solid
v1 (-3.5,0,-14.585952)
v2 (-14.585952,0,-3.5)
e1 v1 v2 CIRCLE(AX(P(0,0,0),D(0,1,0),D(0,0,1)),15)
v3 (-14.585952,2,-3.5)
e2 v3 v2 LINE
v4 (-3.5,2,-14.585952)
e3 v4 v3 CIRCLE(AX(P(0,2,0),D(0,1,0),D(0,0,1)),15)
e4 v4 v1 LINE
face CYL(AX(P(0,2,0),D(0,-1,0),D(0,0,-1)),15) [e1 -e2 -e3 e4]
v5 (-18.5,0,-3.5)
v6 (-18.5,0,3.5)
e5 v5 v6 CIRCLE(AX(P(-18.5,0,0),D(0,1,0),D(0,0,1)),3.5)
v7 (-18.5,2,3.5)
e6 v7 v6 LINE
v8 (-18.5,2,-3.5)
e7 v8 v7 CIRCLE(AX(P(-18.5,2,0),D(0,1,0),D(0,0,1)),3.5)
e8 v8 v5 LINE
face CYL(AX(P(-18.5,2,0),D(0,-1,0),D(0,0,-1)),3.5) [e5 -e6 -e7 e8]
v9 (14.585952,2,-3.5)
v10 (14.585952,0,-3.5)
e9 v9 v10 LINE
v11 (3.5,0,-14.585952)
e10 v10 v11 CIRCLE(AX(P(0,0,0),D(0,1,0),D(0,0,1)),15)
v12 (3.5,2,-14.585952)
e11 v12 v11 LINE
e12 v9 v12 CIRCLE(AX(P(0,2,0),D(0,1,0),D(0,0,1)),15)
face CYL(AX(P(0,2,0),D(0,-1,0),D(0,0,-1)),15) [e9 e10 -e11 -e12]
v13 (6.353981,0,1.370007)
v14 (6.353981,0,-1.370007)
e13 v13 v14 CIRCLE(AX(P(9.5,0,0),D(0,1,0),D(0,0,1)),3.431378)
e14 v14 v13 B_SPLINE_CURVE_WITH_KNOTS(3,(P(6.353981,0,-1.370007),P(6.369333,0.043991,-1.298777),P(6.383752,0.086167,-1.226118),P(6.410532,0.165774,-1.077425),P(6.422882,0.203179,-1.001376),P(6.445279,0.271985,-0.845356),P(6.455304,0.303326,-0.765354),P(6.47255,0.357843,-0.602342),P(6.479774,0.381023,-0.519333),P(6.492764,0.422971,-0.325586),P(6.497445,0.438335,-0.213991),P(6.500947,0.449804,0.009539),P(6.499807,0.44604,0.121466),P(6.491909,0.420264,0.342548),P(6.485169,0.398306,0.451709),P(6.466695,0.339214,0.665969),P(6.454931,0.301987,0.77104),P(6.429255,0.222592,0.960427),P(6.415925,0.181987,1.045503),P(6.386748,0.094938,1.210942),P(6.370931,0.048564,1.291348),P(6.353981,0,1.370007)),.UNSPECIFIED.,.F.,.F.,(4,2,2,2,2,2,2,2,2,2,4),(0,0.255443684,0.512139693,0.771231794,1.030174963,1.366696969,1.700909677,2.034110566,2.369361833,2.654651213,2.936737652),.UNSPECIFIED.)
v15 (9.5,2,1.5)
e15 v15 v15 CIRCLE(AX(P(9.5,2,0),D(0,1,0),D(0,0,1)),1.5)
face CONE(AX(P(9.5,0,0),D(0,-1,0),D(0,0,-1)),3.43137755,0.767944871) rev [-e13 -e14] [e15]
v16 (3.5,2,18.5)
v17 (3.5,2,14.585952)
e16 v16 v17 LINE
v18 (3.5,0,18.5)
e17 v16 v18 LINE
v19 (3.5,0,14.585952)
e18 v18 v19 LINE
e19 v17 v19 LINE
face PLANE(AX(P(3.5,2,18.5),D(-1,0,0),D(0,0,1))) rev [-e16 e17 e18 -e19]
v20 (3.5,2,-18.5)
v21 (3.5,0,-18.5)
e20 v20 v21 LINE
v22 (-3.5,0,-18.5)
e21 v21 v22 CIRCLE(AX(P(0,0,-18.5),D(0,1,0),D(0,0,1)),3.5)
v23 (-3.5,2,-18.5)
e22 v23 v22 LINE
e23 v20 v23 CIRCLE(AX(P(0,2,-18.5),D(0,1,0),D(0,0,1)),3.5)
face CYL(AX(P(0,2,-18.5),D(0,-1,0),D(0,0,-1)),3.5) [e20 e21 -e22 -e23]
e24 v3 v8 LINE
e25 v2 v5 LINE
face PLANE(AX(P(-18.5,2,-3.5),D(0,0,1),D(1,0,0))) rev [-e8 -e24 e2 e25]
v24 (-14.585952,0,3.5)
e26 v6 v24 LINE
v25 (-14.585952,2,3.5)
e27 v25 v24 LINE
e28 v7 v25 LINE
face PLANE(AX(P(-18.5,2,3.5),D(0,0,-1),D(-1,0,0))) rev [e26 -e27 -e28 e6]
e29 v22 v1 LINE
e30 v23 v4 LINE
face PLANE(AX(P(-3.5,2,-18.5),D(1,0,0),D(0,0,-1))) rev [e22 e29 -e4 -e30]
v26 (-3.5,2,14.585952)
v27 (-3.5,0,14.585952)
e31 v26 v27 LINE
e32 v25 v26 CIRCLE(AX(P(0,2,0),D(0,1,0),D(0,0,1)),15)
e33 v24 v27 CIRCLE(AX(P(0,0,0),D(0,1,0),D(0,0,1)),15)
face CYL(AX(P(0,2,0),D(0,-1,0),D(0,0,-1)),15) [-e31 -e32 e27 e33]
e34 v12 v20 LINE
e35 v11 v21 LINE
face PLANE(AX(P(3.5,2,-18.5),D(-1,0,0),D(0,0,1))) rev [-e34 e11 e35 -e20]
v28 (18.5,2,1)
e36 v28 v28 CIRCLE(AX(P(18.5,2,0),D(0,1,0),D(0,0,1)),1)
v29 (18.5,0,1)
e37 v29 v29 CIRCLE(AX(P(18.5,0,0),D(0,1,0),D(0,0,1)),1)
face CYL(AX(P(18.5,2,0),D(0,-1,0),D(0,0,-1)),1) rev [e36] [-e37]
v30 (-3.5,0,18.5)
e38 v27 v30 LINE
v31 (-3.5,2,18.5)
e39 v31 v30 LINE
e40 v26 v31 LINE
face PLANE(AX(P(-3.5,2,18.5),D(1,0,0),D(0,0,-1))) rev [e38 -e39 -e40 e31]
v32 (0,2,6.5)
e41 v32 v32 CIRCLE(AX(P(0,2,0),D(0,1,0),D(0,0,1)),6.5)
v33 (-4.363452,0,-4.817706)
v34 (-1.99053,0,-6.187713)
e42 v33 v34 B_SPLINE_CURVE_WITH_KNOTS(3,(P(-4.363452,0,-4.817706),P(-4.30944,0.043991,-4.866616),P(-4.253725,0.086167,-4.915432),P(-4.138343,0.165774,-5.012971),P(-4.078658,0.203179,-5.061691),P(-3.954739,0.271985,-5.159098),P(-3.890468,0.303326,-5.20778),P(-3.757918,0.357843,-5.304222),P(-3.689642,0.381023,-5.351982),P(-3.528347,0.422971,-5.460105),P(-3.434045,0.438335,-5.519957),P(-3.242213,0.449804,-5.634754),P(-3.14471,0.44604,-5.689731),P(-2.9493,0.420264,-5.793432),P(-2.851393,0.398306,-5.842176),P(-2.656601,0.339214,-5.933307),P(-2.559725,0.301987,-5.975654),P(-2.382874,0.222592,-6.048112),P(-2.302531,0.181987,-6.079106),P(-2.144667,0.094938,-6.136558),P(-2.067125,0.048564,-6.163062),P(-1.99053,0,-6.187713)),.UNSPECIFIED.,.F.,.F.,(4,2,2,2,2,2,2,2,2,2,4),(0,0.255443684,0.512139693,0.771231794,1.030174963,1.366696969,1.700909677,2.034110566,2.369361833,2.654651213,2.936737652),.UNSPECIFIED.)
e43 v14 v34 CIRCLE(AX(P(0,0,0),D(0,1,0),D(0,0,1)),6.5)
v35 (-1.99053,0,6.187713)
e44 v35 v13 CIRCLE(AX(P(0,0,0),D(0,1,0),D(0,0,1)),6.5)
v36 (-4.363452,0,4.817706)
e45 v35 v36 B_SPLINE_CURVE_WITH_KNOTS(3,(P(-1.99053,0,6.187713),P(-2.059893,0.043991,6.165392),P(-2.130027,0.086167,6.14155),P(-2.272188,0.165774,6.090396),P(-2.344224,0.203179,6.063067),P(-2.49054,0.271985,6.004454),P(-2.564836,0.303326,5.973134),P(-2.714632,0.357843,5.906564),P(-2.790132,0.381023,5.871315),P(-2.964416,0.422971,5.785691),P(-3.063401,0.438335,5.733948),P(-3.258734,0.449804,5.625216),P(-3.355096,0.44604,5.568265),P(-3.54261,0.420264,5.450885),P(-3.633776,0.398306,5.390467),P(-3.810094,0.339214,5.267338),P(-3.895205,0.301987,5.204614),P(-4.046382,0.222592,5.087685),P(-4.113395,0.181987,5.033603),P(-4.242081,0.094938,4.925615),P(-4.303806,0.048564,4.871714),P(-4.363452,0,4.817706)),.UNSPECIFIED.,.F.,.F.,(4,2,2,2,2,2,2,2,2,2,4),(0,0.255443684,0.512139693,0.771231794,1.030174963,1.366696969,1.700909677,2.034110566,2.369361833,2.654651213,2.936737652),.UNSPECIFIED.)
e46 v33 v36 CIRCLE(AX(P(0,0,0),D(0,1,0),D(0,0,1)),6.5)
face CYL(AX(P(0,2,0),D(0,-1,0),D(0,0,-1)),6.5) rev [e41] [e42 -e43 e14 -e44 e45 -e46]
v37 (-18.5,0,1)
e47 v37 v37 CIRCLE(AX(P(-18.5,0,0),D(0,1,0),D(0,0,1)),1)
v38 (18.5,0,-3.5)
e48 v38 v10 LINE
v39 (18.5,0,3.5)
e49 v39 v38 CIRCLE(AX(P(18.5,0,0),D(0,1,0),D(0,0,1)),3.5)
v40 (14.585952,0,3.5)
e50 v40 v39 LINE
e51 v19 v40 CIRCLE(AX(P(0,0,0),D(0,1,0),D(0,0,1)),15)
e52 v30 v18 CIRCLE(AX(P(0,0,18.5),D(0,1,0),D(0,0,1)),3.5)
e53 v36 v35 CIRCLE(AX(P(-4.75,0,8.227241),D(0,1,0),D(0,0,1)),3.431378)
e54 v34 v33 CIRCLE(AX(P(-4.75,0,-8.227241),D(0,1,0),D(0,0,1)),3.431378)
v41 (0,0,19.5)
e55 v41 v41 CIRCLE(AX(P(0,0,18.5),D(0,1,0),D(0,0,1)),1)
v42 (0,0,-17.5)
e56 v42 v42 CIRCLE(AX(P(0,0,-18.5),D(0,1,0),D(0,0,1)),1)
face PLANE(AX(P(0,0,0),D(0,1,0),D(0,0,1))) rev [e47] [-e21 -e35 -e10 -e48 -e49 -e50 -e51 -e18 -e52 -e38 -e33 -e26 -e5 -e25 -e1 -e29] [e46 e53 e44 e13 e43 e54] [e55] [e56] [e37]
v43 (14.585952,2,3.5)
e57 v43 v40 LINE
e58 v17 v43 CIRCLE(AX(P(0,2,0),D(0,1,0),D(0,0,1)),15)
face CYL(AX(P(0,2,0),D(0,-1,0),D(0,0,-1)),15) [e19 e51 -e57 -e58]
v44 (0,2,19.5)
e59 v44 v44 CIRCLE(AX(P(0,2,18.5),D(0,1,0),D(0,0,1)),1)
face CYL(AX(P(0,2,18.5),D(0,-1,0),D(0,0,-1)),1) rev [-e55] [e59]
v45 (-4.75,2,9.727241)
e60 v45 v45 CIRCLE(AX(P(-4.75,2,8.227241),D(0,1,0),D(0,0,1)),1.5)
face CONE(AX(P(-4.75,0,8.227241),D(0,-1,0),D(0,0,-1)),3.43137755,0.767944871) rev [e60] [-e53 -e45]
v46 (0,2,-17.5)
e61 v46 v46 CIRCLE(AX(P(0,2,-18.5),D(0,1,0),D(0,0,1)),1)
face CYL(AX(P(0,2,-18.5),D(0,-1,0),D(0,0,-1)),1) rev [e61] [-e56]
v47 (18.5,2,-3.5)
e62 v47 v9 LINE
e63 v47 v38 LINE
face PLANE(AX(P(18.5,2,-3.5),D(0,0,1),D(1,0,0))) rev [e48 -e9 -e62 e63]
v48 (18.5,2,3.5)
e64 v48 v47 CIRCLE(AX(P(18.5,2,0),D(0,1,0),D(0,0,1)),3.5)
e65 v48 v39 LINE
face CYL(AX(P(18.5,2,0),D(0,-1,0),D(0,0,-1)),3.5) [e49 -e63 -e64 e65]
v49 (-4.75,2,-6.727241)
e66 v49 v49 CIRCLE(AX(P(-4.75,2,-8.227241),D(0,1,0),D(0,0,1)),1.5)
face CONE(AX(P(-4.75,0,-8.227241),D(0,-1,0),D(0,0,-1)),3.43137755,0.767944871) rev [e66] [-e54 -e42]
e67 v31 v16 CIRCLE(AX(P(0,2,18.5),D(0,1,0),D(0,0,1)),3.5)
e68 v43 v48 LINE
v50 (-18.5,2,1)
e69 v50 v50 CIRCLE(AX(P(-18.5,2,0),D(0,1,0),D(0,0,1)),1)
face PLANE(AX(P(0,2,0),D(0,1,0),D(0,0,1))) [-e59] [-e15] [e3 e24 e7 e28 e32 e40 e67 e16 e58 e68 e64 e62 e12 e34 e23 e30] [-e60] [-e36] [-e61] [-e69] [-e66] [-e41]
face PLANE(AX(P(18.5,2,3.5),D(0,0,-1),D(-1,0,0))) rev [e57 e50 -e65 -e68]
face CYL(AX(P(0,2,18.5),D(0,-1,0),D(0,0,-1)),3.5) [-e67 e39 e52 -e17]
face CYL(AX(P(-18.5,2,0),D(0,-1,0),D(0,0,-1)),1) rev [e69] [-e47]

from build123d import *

# Parameters (mm, degrees)
SKETCH_2_R       = 15
SKETCH_2_R_2     = 6.5
SKETCH_2_R_3     = 1.5
EXTRUDE_1_DEPTH  = 2
CHAMFER_1_SIZE   = 2
CHAMFER_1_SIZE_2 = 1.93137755
SKETCH_3_R       = 1
EXTRUDE_2_DEPTH  = 2


with BuildPart() as part:
    # 草图2 → 凸台-拉伸1 (new body)
    with BuildSketch(Plane(origin=(0, 0, 0), x_dir=(1, 0, 0), z_dir=(0, 1, 0))):
        with Locations(Location((0, 0, 0), (0, 0, 270))):
            Circle(SKETCH_2_R)
        with Locations(Location((0, 0, 0), (0, 0, 270))):
            Circle(SKETCH_2_R_2, mode=Mode.SUBTRACT)
        with Locations(Location((9.5, 0, 0), (0, 0, 270))):
            Circle(SKETCH_2_R_3, mode=Mode.SUBTRACT)
        with Locations(Location((-4.75, -8.227241336, 0), (0, 0, 270))):
            Circle(SKETCH_2_R_3, mode=Mode.SUBTRACT)
        with Locations(Location((-4.75, 8.227241336, 0), (0, 0, 270))):
            Circle(SKETCH_2_R_3, mode=Mode.SUBTRACT)
    extrude(amount=EXTRUDE_1_DEPTH)

    # 倒角1
    # the kernel refuses this chamfer: 2, 1.93137755 mm, written as the material it takes off along each edge
    with BuildSketch(Plane(origin=(-4.75, 0, 8.227241336), x_dir=(0, 0, 1), z_dir=(-1, 0, 0))) as chamfer_1_piece_1:
        Polygon((1.5, CHAMFER_1_SIZE), (1.5 + CHAMFER_1_SIZE_2, 0), (1.5, 0), align=None)
    revolve(axis=Axis((-4.75, 0, 8.227241336), (0, 1, 0)), mode=Mode.SUBTRACT)
    with BuildSketch(Plane(origin=(-4.75, 0, -8.227241336), x_dir=(0, 0, 1), z_dir=(-1, 0, 0))) as chamfer_1_piece_2:
        Polygon((1.5, CHAMFER_1_SIZE), (1.5 + CHAMFER_1_SIZE_2, 0), (1.5, 0), align=None)
    revolve(axis=Axis((-4.75, 0, -8.227241336), (0, 1, 0)), mode=Mode.SUBTRACT)
    with BuildSketch(Plane(origin=(9.5, 0, 0), x_dir=(0, 0, 1), z_dir=(-1, 0, 0))) as chamfer_1_piece_3:
        Polygon((1.5, CHAMFER_1_SIZE), (1.5 + CHAMFER_1_SIZE_2, 0), (1.5, 0), align=None)
    revolve(axis=Axis((9.5, 0, 0), (0, 1, 0)), mode=Mode.SUBTRACT)

    # 草图3 → 凸台-拉伸2 (add)
    # profile 1 of 4: a face of its own
    with BuildSketch(Plane(origin=(0, 0, 0), x_dir=(1, 0, 0), z_dir=(0, 1, 0))):
        with BuildLine():
            Line((-18.5, -3.5), (-14.585952146, -3.5))
            ThreePointArc((-14.585952146, -3.5), (-15, 0), (-14.585952146, 3.5))
            Line((-14.585952146, 3.5), (-18.5, 3.5))
            ThreePointArc((-18.5, 3.5), (-22, 0), (-18.5, -3.5))
        make_face()
        with Locations(Location((-18.5, 0, 0), (0, 0, 270))):
            Circle(SKETCH_3_R, mode=Mode.SUBTRACT)
    # profile 2 of 4: a face of its own
    with BuildSketch(Plane(origin=(0, 0, 0), x_dir=(1, 0, 0), z_dir=(0, 1, 0))):
        with BuildLine():
            Line((-3.5, 18.5), (-3.5, 14.585952146))
            ThreePointArc((-3.5, 14.585952146), (0, 15), (3.5, 14.585952146))
            Line((3.5, 14.585952146), (3.5, 18.5))
            ThreePointArc((3.5, 18.5), (0, 22), (-3.5, 18.5))
        make_face()
        with Locations(Location((0, 18.5, 0), (0, 0, 270))):
            Circle(SKETCH_3_R, mode=Mode.SUBTRACT)
    # profile 3 of 4: a face of its own
    with BuildSketch(Plane(origin=(0, 0, 0), x_dir=(1, 0, 0), z_dir=(0, 1, 0))):
        with BuildLine():
            Line((18.5, 3.5), (14.585952146, 3.5))
            ThreePointArc((14.585952146, 3.5), (15, 0), (14.585952146, -3.5))
            Line((14.585952146, -3.5), (18.5, -3.5))
            ThreePointArc((18.5, -3.5), (22, 0), (18.5, 3.5))
        make_face()
        with Locations(Location((18.5, 0, 0), (0, 0, 270))):
            Circle(SKETCH_3_R, mode=Mode.SUBTRACT)
    # profile 4 of 4: a face of its own
    with BuildSketch(Plane(origin=(0, 0, 0), x_dir=(1, 0, 0), z_dir=(0, 1, 0))):
        with BuildLine():
            Line((3.5, -18.5), (3.5, -14.585952146))
            ThreePointArc((3.5, -14.585952146), (0, -15), (-3.5, -14.585952146))
            Line((-3.5, -14.585952146), (-3.5, -18.5))
            ThreePointArc((-3.5, -18.5), (0, -22), (3.5, -18.5))
        make_face()
        with Locations(Location((0, -18.5, 0), (0, 0, 270))):
            Circle(SKETCH_3_R, mode=Mode.SUBTRACT)
    extrude(amount=EXTRUDE_2_DEPTH)


solid = part.part
